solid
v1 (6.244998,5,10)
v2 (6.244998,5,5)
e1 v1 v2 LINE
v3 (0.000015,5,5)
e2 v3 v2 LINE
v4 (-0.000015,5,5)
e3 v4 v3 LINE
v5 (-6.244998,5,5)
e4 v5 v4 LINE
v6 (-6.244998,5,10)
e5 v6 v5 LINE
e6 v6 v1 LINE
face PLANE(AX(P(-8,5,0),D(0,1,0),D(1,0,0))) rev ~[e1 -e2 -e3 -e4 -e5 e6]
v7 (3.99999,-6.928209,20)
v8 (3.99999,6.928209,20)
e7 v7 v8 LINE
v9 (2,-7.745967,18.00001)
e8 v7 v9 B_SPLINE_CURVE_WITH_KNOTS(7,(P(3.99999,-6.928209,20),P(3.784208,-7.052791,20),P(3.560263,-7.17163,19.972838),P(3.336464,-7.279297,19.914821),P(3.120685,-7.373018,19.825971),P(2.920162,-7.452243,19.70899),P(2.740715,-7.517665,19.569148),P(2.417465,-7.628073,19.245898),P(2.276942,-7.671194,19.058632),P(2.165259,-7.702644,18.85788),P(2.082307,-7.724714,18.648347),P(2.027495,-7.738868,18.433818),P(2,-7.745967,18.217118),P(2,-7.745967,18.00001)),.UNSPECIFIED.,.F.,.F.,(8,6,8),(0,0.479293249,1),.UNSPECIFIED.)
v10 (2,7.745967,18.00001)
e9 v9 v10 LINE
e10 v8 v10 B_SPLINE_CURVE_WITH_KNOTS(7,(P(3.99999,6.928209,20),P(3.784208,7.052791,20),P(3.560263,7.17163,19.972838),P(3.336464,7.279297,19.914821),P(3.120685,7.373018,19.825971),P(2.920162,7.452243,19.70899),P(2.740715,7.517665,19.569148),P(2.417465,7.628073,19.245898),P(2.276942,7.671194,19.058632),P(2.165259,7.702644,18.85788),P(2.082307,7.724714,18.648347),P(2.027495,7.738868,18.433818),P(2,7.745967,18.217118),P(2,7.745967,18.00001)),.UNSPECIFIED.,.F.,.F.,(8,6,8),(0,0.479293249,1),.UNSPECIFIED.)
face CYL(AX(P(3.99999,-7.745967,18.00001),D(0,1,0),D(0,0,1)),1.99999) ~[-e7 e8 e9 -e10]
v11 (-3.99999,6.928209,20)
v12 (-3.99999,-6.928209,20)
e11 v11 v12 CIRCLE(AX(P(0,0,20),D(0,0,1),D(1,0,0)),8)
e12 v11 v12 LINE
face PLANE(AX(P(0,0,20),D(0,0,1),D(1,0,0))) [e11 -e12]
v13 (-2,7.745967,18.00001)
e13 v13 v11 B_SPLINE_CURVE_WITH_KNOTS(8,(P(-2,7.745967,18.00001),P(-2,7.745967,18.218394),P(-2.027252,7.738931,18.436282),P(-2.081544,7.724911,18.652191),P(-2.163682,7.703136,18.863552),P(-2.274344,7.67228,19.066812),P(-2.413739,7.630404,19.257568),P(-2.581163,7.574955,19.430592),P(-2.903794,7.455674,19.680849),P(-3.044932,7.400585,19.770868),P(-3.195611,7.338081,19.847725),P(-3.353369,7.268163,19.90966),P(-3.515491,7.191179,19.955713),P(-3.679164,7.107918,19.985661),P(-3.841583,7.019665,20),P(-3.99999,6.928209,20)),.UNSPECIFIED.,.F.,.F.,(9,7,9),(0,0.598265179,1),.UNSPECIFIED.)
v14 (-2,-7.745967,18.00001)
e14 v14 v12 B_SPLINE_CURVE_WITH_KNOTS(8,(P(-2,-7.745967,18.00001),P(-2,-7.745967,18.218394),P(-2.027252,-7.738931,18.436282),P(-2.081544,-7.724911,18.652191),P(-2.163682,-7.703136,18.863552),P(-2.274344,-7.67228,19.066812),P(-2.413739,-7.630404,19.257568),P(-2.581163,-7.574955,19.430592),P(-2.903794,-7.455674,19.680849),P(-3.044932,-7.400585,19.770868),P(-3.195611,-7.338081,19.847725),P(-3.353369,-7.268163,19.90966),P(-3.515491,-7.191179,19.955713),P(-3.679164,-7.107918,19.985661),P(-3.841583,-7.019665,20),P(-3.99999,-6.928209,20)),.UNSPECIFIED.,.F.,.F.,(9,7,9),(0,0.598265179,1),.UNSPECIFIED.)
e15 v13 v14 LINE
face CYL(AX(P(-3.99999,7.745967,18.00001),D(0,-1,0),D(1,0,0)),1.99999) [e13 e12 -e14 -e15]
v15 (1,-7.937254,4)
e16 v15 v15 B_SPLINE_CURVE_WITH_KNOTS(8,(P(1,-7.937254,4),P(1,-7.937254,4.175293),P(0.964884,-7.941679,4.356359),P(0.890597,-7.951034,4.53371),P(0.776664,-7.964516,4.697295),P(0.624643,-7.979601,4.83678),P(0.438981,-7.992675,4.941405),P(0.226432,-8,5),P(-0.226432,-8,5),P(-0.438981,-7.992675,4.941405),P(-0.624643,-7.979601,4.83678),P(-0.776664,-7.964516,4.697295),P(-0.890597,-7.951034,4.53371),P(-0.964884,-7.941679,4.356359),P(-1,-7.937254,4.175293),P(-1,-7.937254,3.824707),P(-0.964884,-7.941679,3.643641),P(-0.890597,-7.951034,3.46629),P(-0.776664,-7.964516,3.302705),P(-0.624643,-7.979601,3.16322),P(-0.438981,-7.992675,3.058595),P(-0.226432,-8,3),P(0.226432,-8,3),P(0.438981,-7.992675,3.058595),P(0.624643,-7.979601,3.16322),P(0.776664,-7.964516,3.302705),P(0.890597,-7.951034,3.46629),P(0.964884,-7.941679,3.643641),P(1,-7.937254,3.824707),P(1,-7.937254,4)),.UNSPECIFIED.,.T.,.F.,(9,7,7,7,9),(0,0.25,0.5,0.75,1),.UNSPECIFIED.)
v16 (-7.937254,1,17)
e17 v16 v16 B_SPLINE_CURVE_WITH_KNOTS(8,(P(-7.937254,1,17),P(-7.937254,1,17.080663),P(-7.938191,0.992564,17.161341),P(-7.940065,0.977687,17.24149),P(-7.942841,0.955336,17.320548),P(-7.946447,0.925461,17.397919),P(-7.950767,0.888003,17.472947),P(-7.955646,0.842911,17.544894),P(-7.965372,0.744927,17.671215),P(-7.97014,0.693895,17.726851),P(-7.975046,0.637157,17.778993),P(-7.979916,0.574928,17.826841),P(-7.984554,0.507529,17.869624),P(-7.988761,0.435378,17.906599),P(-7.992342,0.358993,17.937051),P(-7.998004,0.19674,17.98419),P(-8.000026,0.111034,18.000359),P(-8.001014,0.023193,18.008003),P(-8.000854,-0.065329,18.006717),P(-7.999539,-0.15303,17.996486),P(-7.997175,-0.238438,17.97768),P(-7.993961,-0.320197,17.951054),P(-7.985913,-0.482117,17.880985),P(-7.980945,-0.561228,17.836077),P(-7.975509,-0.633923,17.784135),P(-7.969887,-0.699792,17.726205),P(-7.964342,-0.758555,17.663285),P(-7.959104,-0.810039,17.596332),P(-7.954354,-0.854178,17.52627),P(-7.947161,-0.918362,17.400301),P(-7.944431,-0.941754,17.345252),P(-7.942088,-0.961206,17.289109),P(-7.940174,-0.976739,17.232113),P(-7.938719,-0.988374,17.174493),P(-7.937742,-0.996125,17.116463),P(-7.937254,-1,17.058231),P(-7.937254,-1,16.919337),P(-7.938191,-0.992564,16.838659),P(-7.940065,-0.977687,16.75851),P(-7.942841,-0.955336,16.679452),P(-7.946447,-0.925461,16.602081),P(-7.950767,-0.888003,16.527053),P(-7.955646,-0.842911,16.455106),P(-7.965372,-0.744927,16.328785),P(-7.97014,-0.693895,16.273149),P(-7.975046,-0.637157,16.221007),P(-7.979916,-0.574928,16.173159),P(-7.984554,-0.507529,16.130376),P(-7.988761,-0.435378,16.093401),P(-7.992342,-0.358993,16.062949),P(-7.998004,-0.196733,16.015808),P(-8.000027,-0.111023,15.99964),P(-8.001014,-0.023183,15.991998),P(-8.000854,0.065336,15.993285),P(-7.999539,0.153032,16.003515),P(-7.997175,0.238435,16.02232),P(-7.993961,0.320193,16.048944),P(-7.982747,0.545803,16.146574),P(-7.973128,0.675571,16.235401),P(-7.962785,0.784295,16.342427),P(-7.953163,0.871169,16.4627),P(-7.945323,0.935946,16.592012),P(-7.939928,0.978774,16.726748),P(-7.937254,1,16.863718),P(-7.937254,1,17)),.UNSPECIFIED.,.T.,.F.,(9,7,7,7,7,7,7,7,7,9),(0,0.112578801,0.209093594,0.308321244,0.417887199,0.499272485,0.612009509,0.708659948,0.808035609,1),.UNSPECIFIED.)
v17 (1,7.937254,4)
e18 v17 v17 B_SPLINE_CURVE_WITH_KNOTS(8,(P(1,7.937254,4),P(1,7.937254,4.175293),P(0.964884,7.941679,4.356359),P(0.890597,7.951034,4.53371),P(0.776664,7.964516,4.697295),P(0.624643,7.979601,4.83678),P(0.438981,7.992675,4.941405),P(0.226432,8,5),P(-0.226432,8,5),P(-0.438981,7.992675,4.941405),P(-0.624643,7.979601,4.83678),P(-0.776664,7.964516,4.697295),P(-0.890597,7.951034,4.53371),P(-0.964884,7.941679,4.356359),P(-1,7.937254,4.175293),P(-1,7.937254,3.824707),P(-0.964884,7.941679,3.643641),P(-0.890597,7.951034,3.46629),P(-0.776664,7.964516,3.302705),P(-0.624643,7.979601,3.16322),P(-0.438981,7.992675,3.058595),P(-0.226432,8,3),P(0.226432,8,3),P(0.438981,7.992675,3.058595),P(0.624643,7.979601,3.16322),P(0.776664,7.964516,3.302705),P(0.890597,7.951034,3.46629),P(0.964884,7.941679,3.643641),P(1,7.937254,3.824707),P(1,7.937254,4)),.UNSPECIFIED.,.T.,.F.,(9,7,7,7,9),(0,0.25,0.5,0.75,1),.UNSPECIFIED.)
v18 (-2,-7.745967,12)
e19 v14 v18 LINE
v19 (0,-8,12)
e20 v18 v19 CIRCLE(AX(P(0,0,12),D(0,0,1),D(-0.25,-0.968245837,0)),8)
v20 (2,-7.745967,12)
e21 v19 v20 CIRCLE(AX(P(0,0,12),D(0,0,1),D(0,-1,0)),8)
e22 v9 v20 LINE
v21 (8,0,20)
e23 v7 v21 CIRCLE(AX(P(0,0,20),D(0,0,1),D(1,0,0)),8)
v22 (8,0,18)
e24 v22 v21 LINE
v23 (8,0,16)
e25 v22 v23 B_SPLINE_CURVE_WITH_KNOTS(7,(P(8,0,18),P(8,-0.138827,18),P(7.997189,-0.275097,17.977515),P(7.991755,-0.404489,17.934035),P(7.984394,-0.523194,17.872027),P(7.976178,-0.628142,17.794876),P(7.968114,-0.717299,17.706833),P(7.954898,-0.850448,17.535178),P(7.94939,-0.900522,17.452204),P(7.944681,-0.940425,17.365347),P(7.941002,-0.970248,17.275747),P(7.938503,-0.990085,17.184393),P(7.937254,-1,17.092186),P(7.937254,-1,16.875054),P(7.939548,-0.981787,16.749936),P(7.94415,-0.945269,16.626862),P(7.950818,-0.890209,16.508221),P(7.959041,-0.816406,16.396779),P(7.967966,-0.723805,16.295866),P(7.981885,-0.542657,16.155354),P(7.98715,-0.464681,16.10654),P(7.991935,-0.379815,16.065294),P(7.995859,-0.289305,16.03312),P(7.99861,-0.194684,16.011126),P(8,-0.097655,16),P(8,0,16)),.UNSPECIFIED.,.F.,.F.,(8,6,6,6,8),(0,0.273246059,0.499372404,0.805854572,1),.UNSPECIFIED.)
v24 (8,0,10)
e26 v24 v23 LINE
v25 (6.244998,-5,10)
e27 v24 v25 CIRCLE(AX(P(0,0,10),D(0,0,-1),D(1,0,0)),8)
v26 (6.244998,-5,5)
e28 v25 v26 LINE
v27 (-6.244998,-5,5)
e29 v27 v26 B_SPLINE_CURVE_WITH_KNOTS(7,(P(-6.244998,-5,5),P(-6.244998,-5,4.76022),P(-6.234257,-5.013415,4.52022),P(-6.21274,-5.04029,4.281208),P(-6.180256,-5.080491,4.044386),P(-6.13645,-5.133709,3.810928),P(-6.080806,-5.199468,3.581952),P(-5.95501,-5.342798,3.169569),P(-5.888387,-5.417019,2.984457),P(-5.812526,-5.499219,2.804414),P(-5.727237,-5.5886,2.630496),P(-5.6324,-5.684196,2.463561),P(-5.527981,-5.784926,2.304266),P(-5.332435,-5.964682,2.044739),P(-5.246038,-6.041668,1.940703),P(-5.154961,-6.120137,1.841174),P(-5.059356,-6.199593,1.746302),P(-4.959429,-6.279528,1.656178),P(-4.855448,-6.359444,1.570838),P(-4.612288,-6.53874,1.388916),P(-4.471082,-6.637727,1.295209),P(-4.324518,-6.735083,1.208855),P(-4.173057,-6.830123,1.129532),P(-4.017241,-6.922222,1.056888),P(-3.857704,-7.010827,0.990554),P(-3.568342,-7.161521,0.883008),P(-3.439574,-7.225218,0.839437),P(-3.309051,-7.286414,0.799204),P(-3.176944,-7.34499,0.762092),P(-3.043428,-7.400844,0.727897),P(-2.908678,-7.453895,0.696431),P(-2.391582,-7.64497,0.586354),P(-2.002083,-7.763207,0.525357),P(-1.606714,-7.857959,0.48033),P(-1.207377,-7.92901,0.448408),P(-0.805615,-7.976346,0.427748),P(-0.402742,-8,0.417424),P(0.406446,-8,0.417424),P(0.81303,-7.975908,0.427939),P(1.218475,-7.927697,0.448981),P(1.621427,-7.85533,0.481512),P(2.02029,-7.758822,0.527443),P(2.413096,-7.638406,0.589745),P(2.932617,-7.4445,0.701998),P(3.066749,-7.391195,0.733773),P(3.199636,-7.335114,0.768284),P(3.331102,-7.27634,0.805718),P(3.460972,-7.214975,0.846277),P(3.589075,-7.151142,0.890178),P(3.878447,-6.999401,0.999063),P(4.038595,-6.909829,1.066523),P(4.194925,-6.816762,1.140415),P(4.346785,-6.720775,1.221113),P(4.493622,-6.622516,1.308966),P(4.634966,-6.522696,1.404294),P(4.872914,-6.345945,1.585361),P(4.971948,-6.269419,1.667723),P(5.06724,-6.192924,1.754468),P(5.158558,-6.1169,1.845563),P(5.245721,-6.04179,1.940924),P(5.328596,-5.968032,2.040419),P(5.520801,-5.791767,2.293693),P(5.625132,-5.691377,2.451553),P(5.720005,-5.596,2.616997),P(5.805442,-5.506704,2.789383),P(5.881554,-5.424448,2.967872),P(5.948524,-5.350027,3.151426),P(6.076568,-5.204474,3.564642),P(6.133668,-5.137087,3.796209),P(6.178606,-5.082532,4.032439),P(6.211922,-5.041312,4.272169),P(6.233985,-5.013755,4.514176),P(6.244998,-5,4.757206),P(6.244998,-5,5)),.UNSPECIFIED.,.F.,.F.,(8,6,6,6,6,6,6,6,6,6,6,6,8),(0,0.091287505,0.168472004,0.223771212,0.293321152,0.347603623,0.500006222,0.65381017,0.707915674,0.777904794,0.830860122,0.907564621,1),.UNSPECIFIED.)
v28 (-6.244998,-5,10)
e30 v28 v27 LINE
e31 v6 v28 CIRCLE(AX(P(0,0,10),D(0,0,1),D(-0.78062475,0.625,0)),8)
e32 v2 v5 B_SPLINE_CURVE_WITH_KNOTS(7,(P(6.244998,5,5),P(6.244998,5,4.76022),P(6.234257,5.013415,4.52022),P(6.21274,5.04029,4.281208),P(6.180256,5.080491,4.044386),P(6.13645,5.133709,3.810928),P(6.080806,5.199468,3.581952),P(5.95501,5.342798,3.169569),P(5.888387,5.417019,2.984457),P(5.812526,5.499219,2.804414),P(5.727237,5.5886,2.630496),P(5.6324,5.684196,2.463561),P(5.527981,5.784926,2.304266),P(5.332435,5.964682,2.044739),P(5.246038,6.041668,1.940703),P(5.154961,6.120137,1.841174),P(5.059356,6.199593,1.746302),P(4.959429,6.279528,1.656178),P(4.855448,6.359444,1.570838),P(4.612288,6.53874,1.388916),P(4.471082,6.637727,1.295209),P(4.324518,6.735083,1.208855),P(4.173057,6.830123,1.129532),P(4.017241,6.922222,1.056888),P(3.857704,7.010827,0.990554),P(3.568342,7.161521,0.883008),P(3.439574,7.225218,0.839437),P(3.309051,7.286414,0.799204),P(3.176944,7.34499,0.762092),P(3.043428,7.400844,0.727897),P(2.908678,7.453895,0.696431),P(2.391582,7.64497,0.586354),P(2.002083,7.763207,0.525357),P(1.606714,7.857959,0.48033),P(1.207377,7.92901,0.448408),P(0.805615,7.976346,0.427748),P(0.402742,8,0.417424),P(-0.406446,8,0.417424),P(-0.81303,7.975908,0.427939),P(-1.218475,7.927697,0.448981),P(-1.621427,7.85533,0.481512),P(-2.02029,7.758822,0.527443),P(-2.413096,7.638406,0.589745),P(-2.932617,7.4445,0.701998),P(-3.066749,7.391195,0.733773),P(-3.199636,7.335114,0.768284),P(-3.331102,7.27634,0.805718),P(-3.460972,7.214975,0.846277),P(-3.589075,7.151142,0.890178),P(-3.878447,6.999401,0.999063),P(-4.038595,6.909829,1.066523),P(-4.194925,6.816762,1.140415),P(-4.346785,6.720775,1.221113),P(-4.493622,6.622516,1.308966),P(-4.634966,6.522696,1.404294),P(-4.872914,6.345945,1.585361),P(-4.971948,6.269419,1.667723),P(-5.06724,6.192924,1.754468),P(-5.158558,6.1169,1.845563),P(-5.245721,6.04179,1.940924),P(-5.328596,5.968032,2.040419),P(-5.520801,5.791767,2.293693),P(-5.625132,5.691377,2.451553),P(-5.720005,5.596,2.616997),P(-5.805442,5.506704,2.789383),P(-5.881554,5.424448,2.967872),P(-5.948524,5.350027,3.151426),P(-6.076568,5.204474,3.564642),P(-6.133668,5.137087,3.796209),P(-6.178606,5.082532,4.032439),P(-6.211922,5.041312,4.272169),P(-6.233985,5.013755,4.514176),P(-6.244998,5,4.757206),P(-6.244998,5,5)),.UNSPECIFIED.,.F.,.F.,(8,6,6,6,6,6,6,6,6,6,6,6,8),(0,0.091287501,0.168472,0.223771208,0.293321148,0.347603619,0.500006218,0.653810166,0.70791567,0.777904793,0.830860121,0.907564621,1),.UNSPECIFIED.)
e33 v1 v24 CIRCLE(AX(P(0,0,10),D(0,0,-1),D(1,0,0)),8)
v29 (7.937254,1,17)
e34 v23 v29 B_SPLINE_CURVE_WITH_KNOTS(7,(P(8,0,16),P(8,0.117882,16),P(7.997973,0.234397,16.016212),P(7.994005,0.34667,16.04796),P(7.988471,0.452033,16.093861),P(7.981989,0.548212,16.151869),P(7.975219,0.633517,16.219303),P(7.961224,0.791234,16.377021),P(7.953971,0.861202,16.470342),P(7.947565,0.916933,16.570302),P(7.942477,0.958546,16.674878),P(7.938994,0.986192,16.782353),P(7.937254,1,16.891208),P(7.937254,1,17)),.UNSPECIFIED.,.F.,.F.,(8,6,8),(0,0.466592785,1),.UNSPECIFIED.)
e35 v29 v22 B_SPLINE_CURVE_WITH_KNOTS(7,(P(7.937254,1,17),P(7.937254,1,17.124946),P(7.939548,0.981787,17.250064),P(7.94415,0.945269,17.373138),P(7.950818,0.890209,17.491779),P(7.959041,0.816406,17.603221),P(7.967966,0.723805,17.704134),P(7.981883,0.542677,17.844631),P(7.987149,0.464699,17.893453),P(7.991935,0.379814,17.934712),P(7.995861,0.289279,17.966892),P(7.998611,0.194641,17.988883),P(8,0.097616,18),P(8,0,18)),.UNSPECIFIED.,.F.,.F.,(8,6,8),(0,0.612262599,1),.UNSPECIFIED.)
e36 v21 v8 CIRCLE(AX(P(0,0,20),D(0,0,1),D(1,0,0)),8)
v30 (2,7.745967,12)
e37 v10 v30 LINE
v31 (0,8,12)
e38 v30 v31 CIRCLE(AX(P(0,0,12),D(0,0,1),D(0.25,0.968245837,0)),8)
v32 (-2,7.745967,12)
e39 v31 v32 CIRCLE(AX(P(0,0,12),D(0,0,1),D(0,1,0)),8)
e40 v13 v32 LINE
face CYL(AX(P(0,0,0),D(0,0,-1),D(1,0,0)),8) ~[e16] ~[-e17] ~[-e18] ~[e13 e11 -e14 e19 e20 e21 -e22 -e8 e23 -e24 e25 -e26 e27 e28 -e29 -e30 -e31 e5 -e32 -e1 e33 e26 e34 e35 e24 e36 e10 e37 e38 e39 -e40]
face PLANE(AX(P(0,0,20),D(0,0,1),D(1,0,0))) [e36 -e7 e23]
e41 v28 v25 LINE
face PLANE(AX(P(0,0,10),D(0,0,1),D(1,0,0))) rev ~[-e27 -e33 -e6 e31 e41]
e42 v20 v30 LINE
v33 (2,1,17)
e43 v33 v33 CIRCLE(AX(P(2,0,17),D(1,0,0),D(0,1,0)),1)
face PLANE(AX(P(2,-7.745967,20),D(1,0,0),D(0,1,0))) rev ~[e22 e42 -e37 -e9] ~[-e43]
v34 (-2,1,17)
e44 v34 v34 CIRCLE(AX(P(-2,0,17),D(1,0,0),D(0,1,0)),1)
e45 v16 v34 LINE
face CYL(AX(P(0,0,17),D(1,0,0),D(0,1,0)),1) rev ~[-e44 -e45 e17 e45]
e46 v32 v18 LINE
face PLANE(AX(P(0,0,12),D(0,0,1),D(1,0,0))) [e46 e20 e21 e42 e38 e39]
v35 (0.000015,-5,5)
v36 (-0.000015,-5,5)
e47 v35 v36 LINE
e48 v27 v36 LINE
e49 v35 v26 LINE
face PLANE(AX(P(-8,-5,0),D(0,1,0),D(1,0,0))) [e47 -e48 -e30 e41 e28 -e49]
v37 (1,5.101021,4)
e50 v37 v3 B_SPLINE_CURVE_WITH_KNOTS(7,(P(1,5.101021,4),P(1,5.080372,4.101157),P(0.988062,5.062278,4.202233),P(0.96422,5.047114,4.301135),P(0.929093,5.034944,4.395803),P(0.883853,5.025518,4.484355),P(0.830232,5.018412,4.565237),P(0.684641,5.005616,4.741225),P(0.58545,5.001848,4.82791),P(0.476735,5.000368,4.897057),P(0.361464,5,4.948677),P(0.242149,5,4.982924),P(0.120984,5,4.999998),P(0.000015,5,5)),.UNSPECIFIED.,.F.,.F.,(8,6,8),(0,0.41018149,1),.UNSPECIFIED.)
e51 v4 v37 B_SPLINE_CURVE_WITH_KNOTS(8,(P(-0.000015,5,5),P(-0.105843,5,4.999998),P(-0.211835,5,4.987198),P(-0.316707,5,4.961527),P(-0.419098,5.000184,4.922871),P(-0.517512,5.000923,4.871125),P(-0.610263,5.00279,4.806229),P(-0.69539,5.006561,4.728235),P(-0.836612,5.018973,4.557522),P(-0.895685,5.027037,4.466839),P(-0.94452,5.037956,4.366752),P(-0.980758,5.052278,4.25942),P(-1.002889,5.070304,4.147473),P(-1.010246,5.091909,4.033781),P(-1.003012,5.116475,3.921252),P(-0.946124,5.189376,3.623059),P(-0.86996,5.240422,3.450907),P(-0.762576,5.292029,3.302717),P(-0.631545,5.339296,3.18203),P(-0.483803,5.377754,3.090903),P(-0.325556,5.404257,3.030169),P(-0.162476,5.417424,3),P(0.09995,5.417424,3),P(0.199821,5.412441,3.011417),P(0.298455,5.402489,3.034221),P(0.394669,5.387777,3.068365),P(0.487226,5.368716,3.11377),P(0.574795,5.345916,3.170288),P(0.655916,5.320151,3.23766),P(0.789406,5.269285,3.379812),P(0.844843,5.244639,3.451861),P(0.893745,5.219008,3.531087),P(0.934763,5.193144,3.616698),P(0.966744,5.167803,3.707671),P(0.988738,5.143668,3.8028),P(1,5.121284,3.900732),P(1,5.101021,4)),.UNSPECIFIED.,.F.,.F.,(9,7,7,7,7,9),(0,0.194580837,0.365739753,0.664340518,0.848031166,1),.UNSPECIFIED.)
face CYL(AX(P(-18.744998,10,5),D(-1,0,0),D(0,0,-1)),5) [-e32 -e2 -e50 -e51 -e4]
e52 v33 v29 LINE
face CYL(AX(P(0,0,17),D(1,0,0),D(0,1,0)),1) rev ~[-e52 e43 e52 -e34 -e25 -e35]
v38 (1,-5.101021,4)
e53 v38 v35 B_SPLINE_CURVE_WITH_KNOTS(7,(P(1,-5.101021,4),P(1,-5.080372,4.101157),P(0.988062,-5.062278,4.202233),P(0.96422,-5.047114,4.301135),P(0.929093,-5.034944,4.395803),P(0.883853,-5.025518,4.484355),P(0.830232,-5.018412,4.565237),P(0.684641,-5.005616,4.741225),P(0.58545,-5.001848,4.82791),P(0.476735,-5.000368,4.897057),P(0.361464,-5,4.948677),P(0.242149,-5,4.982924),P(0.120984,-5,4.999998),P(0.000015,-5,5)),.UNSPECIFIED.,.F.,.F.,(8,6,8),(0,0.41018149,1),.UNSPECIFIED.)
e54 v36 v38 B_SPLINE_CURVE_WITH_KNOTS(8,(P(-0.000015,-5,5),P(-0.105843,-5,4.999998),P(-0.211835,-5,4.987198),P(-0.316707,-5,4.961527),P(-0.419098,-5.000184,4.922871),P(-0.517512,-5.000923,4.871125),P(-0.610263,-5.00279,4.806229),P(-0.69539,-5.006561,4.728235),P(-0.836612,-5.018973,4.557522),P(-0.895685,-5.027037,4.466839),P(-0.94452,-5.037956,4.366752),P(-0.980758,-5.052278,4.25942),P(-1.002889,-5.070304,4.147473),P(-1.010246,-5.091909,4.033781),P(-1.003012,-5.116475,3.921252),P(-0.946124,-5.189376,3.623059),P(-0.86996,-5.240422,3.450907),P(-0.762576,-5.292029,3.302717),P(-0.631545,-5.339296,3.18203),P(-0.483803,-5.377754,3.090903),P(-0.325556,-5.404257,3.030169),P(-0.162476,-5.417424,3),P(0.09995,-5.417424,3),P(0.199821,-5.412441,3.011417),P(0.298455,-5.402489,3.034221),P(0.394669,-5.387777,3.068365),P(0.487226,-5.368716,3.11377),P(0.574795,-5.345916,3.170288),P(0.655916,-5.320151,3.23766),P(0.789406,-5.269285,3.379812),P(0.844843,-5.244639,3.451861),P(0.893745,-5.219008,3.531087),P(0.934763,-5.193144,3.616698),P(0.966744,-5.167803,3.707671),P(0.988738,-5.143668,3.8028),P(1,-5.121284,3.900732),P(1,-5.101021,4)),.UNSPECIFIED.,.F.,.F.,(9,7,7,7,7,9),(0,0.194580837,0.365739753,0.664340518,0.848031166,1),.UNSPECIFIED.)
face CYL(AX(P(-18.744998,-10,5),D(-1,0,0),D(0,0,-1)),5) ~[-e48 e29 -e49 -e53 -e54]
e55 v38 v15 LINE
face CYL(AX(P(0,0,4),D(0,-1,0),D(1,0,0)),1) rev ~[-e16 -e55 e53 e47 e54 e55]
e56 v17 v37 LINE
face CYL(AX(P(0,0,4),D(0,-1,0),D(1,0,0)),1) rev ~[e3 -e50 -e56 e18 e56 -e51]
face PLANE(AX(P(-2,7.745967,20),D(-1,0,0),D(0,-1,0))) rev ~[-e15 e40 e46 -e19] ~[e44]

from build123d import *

# Parameters (mm, degrees)
F0_R        = 8
F1_DEPTH    = 20
F2_W        = 16
F2_H        = 10
F3_DEPTH    = 10
F4_T1_DEPTH = 37.4899959968
F5_R        = 1
F6_DEPTH    = 12.5
F8_DEPTH    = 8
F9_R        = 1
F10_DEPTH   = 12.5
F11_R       = 1.99999


# Not quite as in the source:
# - a fillet or chamfer that OpenCascade refuses, or shapes differently, is made with other operations: its cross-section is extruded or revolved along the edge and cut away or added
# - a fillet or chamfer is up to 0.001 mm smaller than in the source, because OpenCascade refuses the exact size


with BuildPart() as f1:
    # F0 (on Top) → F1 (new body)
    with BuildSketch(Plane.XY):
        Circle(F0_R)
    extrude(amount=F1_DEPTH)

    # F2 (on Top) → F3 (cut)
    with BuildSketch(Plane.XY):
        Rectangle(F2_W, F2_H)
    extrude(amount=F3_DEPTH, mode=Mode.SUBTRACT)

    # F4: fillet of radius 5 on 2 edges, made by hand

    # F4_s2 → F4_t1 (cut)
    with BuildSketch(Plane.YZ.offset(-18.7449979984)):
        with BuildLine():
            ThreePointArc((-10, 0), (-6.4644660941, 1.4644660941), (-5, 5))
            Line((-5, 5), (-5, 0))
            Line((-5, 0), (-10, 0))
        make_face()
        with BuildLine():
            ThreePointArc((10, 0), (6.4644660941, 1.4644660941), (5, 5))
            Line((5, 5), (5, 0))
            Line((5, 0), (10, 0))
        make_face()
    extrude(amount=F4_T1_DEPTH, mode=Mode.SUBTRACT)

    # F5 (on Front) → F6 (cut, symmetric)
    with BuildSketch(Plane.XZ):
        with Locations((0, 4)):
            Circle(F5_R)
    extrude(amount=F6_DEPTH, both=True, mode=Mode.SUBTRACT)

    # F7 (on face) → F8 (cut)
    with BuildSketch(Plane.XY.offset(20)):
        with BuildLine():
            ThreePointArc((2, 7.7459666924), (1.0080343399, 7.9362375701), (0, 8))
            ThreePointArc((0, 8), (-1.0080343399, 7.9362375701), (-2, 7.7459666924))
            Line((-2, 7.7459666924), (-2, -7.7459666924))
            ThreePointArc((-2, -7.7459666924), (-1.0080343399, -7.9362375701), (0, -8))
            ThreePointArc((0, -8), (1.0080343399, -7.9362375701), (2, -7.7459666924))
            Line((2, -7.7459666924), (2, 7.7459666924))
        make_face()
    extrude(amount=-F8_DEPTH, mode=Mode.SUBTRACT)

    # F9 (on Right) → F10 (cut, symmetric)
    with BuildSketch(Plane.YZ):
        with Locations((0, 17)):
            Circle(F9_R)
    extrude(amount=F10_DEPTH, both=True, mode=Mode.SUBTRACT)

    # F11 (radius 2 in the source; OpenCascade refuses exactly that, so slightly less here)
    f11_edges = [f1.edges().sort_by_distance(p)[0] for p in [
        (-2, 0, 20),
        (2, 0, 20),
    ]]
    fillet(f11_edges, radius=F11_R)


solid = f1.part
